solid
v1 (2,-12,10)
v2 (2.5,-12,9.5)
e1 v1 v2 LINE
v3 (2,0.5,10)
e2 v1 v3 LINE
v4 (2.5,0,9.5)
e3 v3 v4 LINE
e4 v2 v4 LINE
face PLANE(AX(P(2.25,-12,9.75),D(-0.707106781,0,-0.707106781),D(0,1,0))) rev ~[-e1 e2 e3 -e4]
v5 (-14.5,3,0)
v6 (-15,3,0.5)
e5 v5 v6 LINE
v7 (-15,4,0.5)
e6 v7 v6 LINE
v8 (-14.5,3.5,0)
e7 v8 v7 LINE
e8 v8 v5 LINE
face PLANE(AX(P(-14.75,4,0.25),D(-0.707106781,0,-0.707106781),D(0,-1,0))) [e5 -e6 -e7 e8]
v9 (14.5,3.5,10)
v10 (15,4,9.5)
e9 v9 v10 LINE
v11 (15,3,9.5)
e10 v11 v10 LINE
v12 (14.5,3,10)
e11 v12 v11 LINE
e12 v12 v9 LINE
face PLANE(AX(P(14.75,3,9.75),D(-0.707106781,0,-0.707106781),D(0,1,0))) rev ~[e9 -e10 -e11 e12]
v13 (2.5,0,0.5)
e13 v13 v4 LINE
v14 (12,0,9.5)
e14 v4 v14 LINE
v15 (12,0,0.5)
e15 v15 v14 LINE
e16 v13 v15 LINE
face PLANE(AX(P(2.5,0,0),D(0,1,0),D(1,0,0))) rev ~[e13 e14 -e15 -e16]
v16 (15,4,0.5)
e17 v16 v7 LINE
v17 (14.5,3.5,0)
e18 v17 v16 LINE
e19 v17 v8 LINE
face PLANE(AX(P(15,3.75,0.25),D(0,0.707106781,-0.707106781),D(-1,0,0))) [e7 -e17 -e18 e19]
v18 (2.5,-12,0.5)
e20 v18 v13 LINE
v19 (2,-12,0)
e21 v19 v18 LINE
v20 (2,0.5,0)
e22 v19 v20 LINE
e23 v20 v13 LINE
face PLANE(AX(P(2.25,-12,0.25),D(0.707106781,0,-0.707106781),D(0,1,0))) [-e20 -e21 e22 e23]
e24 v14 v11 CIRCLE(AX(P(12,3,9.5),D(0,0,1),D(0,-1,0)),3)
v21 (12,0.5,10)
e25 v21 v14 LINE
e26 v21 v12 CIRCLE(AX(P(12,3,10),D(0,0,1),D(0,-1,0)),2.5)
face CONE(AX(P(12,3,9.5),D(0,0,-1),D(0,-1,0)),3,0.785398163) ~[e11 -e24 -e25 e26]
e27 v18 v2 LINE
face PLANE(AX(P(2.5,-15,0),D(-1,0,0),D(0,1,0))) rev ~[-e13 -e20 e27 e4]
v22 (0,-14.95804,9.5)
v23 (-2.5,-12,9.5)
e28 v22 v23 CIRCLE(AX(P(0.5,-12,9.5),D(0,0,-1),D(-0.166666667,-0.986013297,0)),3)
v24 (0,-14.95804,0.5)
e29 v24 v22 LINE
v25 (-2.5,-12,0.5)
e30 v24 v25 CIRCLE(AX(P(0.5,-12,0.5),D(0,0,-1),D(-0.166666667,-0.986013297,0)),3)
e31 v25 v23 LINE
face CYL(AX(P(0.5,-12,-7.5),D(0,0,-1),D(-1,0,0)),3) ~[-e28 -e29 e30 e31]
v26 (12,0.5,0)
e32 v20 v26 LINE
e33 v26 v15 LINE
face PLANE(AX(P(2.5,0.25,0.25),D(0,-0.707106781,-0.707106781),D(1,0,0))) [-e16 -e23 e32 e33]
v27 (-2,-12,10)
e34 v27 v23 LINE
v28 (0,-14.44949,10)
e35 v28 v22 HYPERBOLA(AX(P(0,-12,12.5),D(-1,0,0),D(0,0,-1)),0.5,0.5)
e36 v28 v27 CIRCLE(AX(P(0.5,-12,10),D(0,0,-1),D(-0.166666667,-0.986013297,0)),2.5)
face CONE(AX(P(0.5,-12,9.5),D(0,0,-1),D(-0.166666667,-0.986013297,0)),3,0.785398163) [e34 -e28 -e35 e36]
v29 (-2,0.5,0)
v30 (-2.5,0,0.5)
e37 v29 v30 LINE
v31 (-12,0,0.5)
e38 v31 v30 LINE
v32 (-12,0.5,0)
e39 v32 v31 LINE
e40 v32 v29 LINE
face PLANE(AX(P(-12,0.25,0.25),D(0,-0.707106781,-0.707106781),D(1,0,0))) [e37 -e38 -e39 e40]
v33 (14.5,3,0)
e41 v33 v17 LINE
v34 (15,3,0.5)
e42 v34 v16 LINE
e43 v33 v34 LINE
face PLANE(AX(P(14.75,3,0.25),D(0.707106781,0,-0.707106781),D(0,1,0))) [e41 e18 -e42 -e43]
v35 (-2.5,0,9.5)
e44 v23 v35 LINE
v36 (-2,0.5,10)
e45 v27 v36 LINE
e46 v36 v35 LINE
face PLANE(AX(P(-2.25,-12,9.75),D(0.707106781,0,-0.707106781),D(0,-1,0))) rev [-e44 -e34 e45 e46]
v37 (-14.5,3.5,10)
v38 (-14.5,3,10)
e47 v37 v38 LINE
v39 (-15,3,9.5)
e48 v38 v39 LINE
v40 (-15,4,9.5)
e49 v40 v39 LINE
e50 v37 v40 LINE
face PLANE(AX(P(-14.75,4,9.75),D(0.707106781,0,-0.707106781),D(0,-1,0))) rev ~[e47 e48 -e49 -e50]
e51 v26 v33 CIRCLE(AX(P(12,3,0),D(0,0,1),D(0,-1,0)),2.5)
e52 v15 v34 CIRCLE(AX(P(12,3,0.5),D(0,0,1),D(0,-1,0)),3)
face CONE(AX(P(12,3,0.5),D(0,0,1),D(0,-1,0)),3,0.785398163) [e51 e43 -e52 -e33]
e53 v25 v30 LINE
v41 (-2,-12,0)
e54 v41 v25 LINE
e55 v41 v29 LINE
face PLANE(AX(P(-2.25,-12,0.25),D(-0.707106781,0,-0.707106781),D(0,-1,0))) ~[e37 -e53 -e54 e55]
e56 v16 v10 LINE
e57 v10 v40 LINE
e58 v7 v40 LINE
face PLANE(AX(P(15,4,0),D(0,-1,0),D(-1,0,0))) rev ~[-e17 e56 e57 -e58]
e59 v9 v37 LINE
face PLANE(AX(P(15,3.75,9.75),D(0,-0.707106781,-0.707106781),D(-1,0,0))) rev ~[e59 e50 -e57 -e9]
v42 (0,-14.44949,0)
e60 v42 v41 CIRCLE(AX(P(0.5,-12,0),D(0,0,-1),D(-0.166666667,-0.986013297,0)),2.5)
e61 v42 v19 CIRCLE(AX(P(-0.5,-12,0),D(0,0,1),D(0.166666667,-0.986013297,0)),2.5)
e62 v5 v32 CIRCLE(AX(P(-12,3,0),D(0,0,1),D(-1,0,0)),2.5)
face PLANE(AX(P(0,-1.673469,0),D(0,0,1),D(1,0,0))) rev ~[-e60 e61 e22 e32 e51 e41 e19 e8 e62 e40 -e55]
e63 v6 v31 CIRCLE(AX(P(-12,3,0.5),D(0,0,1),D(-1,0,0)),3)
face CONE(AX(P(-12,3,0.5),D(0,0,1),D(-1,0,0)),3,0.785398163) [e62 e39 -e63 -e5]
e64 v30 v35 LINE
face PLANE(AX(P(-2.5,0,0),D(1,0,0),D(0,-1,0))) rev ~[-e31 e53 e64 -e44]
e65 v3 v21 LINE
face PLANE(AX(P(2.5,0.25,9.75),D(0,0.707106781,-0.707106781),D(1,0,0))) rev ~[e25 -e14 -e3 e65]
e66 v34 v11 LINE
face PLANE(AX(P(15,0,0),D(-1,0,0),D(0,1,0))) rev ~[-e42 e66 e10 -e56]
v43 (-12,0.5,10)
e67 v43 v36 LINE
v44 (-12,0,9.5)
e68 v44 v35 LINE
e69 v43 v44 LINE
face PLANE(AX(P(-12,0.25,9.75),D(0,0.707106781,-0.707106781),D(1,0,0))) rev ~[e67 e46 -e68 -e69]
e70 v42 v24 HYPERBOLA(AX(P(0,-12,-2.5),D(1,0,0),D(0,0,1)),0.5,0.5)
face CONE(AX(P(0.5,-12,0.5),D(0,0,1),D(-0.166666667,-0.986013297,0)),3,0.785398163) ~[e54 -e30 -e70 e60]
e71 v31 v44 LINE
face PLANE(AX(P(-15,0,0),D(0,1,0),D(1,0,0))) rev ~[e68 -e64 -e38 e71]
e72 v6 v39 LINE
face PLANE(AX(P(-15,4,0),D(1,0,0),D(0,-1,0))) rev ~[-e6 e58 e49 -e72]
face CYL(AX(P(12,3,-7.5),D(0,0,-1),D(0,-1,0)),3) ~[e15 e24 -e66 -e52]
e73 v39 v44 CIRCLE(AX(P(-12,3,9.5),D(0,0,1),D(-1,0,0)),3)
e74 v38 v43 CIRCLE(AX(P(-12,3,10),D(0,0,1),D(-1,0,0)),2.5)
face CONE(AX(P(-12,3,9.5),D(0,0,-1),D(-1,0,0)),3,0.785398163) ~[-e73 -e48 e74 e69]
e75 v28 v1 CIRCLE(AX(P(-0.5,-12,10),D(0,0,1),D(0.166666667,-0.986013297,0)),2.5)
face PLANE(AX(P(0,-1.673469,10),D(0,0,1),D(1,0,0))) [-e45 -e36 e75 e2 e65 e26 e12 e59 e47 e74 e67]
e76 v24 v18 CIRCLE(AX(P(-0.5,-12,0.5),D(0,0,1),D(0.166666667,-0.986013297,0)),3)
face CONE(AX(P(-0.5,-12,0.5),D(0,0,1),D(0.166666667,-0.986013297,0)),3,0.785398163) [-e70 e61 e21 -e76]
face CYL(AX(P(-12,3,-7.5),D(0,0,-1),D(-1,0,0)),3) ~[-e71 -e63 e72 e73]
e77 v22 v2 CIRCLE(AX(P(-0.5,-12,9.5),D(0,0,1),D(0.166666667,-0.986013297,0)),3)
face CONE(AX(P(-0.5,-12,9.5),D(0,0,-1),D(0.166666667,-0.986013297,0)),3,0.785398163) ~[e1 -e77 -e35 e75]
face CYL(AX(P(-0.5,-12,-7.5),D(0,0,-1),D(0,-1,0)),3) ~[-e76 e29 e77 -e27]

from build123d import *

# Parameters (mm, degrees)
F1_DEPTH    = 10
F2_T1_DEPTH = 25
F3_SIZE     = 0.5


# Not quite as in the source:
# - a fillet or chamfer that OpenCascade refuses, or shapes differently, is made with other operations: its cross-section is extruded or revolved along the edge and cut away or added


with BuildPart() as f1:
    # F0 (on Top) → F1 (new body)
    with BuildSketch(Plane.XY):
        Polygon((-15, 4), (-15, 0), (-2.5, 0), (-2.5, -15), (2.5, -15), (2.5, 0), (15, 0), (15, 4), align=None)
    extrude(amount=F1_DEPTH)

    # F2: fillet of radius 3 on 4 edges, made by hand

    # F2_s2 → F2_t1 (cut)
    with BuildSketch(Plane.XY.offset(-7.5)):
        with BuildLine():
            ThreePointArc((-2.5, -12), (-1.6213203436, -14.1213203436), (0.5, -15))
            Line((0.5, -15), (-2.5, -15))
            Line((-2.5, -15), (-2.5, -12))
        make_face()
        with BuildLine():
            ThreePointArc((-0.5, -15), (1.6213203436, -14.1213203436), (2.5, -12))
            Line((2.5, -12), (2.5, -15))
            Line((2.5, -15), (-0.5, -15))
        make_face()
        with BuildLine():
            ThreePointArc((-15, 3), (-14.1213203436, 0.8786796564), (-12, 0))
            Line((-12, 0), (-15, 0))
            Line((-15, 0), (-15, 3))
        make_face()
        with BuildLine():
            ThreePointArc((12, 0), (14.1213203436, 0.8786796564), (15, 3))
            Line((15, 3), (15, 0))
            Line((15, 0), (12, 0))
        make_face()
    extrude(amount=F2_T1_DEPTH, mode=Mode.SUBTRACT)

    # F3
    f3_edges = [f1.edges().sort_by_distance(p)[0] for p in [
        (0, 4, 10),
        (15, 3.5, 10),
        (14.12132, 0.87868, 10),
        (7.25, 0, 10),
        (2.5, -6, 10),
        (1.791288, -13.936492, 10),
        (-1.791288, -13.936492, 10),
        (-2.5, -6, 10),
        (-7.25, 0, 10),
        (-14.12132, 0.87868, 10),
        (-15, 3.5, 10),
        (0, 4, 0),
        (15, 3.5, 0),
        (14.12132, 0.87868, 0),
        (7.25, 0, 0),
        (2.5, -6, 0),
        (1.791288, -13.936492, 0),
        (-1.791288, -13.936492, 0),
        (-2.5, -6, 0),
        (-7.25, 0, 0),
        (-14.12132, 0.87868, 0),
        (-15, 3.5, 0),
    ]]
    chamfer(f3_edges, length=F3_SIZE)


solid = f1.part
